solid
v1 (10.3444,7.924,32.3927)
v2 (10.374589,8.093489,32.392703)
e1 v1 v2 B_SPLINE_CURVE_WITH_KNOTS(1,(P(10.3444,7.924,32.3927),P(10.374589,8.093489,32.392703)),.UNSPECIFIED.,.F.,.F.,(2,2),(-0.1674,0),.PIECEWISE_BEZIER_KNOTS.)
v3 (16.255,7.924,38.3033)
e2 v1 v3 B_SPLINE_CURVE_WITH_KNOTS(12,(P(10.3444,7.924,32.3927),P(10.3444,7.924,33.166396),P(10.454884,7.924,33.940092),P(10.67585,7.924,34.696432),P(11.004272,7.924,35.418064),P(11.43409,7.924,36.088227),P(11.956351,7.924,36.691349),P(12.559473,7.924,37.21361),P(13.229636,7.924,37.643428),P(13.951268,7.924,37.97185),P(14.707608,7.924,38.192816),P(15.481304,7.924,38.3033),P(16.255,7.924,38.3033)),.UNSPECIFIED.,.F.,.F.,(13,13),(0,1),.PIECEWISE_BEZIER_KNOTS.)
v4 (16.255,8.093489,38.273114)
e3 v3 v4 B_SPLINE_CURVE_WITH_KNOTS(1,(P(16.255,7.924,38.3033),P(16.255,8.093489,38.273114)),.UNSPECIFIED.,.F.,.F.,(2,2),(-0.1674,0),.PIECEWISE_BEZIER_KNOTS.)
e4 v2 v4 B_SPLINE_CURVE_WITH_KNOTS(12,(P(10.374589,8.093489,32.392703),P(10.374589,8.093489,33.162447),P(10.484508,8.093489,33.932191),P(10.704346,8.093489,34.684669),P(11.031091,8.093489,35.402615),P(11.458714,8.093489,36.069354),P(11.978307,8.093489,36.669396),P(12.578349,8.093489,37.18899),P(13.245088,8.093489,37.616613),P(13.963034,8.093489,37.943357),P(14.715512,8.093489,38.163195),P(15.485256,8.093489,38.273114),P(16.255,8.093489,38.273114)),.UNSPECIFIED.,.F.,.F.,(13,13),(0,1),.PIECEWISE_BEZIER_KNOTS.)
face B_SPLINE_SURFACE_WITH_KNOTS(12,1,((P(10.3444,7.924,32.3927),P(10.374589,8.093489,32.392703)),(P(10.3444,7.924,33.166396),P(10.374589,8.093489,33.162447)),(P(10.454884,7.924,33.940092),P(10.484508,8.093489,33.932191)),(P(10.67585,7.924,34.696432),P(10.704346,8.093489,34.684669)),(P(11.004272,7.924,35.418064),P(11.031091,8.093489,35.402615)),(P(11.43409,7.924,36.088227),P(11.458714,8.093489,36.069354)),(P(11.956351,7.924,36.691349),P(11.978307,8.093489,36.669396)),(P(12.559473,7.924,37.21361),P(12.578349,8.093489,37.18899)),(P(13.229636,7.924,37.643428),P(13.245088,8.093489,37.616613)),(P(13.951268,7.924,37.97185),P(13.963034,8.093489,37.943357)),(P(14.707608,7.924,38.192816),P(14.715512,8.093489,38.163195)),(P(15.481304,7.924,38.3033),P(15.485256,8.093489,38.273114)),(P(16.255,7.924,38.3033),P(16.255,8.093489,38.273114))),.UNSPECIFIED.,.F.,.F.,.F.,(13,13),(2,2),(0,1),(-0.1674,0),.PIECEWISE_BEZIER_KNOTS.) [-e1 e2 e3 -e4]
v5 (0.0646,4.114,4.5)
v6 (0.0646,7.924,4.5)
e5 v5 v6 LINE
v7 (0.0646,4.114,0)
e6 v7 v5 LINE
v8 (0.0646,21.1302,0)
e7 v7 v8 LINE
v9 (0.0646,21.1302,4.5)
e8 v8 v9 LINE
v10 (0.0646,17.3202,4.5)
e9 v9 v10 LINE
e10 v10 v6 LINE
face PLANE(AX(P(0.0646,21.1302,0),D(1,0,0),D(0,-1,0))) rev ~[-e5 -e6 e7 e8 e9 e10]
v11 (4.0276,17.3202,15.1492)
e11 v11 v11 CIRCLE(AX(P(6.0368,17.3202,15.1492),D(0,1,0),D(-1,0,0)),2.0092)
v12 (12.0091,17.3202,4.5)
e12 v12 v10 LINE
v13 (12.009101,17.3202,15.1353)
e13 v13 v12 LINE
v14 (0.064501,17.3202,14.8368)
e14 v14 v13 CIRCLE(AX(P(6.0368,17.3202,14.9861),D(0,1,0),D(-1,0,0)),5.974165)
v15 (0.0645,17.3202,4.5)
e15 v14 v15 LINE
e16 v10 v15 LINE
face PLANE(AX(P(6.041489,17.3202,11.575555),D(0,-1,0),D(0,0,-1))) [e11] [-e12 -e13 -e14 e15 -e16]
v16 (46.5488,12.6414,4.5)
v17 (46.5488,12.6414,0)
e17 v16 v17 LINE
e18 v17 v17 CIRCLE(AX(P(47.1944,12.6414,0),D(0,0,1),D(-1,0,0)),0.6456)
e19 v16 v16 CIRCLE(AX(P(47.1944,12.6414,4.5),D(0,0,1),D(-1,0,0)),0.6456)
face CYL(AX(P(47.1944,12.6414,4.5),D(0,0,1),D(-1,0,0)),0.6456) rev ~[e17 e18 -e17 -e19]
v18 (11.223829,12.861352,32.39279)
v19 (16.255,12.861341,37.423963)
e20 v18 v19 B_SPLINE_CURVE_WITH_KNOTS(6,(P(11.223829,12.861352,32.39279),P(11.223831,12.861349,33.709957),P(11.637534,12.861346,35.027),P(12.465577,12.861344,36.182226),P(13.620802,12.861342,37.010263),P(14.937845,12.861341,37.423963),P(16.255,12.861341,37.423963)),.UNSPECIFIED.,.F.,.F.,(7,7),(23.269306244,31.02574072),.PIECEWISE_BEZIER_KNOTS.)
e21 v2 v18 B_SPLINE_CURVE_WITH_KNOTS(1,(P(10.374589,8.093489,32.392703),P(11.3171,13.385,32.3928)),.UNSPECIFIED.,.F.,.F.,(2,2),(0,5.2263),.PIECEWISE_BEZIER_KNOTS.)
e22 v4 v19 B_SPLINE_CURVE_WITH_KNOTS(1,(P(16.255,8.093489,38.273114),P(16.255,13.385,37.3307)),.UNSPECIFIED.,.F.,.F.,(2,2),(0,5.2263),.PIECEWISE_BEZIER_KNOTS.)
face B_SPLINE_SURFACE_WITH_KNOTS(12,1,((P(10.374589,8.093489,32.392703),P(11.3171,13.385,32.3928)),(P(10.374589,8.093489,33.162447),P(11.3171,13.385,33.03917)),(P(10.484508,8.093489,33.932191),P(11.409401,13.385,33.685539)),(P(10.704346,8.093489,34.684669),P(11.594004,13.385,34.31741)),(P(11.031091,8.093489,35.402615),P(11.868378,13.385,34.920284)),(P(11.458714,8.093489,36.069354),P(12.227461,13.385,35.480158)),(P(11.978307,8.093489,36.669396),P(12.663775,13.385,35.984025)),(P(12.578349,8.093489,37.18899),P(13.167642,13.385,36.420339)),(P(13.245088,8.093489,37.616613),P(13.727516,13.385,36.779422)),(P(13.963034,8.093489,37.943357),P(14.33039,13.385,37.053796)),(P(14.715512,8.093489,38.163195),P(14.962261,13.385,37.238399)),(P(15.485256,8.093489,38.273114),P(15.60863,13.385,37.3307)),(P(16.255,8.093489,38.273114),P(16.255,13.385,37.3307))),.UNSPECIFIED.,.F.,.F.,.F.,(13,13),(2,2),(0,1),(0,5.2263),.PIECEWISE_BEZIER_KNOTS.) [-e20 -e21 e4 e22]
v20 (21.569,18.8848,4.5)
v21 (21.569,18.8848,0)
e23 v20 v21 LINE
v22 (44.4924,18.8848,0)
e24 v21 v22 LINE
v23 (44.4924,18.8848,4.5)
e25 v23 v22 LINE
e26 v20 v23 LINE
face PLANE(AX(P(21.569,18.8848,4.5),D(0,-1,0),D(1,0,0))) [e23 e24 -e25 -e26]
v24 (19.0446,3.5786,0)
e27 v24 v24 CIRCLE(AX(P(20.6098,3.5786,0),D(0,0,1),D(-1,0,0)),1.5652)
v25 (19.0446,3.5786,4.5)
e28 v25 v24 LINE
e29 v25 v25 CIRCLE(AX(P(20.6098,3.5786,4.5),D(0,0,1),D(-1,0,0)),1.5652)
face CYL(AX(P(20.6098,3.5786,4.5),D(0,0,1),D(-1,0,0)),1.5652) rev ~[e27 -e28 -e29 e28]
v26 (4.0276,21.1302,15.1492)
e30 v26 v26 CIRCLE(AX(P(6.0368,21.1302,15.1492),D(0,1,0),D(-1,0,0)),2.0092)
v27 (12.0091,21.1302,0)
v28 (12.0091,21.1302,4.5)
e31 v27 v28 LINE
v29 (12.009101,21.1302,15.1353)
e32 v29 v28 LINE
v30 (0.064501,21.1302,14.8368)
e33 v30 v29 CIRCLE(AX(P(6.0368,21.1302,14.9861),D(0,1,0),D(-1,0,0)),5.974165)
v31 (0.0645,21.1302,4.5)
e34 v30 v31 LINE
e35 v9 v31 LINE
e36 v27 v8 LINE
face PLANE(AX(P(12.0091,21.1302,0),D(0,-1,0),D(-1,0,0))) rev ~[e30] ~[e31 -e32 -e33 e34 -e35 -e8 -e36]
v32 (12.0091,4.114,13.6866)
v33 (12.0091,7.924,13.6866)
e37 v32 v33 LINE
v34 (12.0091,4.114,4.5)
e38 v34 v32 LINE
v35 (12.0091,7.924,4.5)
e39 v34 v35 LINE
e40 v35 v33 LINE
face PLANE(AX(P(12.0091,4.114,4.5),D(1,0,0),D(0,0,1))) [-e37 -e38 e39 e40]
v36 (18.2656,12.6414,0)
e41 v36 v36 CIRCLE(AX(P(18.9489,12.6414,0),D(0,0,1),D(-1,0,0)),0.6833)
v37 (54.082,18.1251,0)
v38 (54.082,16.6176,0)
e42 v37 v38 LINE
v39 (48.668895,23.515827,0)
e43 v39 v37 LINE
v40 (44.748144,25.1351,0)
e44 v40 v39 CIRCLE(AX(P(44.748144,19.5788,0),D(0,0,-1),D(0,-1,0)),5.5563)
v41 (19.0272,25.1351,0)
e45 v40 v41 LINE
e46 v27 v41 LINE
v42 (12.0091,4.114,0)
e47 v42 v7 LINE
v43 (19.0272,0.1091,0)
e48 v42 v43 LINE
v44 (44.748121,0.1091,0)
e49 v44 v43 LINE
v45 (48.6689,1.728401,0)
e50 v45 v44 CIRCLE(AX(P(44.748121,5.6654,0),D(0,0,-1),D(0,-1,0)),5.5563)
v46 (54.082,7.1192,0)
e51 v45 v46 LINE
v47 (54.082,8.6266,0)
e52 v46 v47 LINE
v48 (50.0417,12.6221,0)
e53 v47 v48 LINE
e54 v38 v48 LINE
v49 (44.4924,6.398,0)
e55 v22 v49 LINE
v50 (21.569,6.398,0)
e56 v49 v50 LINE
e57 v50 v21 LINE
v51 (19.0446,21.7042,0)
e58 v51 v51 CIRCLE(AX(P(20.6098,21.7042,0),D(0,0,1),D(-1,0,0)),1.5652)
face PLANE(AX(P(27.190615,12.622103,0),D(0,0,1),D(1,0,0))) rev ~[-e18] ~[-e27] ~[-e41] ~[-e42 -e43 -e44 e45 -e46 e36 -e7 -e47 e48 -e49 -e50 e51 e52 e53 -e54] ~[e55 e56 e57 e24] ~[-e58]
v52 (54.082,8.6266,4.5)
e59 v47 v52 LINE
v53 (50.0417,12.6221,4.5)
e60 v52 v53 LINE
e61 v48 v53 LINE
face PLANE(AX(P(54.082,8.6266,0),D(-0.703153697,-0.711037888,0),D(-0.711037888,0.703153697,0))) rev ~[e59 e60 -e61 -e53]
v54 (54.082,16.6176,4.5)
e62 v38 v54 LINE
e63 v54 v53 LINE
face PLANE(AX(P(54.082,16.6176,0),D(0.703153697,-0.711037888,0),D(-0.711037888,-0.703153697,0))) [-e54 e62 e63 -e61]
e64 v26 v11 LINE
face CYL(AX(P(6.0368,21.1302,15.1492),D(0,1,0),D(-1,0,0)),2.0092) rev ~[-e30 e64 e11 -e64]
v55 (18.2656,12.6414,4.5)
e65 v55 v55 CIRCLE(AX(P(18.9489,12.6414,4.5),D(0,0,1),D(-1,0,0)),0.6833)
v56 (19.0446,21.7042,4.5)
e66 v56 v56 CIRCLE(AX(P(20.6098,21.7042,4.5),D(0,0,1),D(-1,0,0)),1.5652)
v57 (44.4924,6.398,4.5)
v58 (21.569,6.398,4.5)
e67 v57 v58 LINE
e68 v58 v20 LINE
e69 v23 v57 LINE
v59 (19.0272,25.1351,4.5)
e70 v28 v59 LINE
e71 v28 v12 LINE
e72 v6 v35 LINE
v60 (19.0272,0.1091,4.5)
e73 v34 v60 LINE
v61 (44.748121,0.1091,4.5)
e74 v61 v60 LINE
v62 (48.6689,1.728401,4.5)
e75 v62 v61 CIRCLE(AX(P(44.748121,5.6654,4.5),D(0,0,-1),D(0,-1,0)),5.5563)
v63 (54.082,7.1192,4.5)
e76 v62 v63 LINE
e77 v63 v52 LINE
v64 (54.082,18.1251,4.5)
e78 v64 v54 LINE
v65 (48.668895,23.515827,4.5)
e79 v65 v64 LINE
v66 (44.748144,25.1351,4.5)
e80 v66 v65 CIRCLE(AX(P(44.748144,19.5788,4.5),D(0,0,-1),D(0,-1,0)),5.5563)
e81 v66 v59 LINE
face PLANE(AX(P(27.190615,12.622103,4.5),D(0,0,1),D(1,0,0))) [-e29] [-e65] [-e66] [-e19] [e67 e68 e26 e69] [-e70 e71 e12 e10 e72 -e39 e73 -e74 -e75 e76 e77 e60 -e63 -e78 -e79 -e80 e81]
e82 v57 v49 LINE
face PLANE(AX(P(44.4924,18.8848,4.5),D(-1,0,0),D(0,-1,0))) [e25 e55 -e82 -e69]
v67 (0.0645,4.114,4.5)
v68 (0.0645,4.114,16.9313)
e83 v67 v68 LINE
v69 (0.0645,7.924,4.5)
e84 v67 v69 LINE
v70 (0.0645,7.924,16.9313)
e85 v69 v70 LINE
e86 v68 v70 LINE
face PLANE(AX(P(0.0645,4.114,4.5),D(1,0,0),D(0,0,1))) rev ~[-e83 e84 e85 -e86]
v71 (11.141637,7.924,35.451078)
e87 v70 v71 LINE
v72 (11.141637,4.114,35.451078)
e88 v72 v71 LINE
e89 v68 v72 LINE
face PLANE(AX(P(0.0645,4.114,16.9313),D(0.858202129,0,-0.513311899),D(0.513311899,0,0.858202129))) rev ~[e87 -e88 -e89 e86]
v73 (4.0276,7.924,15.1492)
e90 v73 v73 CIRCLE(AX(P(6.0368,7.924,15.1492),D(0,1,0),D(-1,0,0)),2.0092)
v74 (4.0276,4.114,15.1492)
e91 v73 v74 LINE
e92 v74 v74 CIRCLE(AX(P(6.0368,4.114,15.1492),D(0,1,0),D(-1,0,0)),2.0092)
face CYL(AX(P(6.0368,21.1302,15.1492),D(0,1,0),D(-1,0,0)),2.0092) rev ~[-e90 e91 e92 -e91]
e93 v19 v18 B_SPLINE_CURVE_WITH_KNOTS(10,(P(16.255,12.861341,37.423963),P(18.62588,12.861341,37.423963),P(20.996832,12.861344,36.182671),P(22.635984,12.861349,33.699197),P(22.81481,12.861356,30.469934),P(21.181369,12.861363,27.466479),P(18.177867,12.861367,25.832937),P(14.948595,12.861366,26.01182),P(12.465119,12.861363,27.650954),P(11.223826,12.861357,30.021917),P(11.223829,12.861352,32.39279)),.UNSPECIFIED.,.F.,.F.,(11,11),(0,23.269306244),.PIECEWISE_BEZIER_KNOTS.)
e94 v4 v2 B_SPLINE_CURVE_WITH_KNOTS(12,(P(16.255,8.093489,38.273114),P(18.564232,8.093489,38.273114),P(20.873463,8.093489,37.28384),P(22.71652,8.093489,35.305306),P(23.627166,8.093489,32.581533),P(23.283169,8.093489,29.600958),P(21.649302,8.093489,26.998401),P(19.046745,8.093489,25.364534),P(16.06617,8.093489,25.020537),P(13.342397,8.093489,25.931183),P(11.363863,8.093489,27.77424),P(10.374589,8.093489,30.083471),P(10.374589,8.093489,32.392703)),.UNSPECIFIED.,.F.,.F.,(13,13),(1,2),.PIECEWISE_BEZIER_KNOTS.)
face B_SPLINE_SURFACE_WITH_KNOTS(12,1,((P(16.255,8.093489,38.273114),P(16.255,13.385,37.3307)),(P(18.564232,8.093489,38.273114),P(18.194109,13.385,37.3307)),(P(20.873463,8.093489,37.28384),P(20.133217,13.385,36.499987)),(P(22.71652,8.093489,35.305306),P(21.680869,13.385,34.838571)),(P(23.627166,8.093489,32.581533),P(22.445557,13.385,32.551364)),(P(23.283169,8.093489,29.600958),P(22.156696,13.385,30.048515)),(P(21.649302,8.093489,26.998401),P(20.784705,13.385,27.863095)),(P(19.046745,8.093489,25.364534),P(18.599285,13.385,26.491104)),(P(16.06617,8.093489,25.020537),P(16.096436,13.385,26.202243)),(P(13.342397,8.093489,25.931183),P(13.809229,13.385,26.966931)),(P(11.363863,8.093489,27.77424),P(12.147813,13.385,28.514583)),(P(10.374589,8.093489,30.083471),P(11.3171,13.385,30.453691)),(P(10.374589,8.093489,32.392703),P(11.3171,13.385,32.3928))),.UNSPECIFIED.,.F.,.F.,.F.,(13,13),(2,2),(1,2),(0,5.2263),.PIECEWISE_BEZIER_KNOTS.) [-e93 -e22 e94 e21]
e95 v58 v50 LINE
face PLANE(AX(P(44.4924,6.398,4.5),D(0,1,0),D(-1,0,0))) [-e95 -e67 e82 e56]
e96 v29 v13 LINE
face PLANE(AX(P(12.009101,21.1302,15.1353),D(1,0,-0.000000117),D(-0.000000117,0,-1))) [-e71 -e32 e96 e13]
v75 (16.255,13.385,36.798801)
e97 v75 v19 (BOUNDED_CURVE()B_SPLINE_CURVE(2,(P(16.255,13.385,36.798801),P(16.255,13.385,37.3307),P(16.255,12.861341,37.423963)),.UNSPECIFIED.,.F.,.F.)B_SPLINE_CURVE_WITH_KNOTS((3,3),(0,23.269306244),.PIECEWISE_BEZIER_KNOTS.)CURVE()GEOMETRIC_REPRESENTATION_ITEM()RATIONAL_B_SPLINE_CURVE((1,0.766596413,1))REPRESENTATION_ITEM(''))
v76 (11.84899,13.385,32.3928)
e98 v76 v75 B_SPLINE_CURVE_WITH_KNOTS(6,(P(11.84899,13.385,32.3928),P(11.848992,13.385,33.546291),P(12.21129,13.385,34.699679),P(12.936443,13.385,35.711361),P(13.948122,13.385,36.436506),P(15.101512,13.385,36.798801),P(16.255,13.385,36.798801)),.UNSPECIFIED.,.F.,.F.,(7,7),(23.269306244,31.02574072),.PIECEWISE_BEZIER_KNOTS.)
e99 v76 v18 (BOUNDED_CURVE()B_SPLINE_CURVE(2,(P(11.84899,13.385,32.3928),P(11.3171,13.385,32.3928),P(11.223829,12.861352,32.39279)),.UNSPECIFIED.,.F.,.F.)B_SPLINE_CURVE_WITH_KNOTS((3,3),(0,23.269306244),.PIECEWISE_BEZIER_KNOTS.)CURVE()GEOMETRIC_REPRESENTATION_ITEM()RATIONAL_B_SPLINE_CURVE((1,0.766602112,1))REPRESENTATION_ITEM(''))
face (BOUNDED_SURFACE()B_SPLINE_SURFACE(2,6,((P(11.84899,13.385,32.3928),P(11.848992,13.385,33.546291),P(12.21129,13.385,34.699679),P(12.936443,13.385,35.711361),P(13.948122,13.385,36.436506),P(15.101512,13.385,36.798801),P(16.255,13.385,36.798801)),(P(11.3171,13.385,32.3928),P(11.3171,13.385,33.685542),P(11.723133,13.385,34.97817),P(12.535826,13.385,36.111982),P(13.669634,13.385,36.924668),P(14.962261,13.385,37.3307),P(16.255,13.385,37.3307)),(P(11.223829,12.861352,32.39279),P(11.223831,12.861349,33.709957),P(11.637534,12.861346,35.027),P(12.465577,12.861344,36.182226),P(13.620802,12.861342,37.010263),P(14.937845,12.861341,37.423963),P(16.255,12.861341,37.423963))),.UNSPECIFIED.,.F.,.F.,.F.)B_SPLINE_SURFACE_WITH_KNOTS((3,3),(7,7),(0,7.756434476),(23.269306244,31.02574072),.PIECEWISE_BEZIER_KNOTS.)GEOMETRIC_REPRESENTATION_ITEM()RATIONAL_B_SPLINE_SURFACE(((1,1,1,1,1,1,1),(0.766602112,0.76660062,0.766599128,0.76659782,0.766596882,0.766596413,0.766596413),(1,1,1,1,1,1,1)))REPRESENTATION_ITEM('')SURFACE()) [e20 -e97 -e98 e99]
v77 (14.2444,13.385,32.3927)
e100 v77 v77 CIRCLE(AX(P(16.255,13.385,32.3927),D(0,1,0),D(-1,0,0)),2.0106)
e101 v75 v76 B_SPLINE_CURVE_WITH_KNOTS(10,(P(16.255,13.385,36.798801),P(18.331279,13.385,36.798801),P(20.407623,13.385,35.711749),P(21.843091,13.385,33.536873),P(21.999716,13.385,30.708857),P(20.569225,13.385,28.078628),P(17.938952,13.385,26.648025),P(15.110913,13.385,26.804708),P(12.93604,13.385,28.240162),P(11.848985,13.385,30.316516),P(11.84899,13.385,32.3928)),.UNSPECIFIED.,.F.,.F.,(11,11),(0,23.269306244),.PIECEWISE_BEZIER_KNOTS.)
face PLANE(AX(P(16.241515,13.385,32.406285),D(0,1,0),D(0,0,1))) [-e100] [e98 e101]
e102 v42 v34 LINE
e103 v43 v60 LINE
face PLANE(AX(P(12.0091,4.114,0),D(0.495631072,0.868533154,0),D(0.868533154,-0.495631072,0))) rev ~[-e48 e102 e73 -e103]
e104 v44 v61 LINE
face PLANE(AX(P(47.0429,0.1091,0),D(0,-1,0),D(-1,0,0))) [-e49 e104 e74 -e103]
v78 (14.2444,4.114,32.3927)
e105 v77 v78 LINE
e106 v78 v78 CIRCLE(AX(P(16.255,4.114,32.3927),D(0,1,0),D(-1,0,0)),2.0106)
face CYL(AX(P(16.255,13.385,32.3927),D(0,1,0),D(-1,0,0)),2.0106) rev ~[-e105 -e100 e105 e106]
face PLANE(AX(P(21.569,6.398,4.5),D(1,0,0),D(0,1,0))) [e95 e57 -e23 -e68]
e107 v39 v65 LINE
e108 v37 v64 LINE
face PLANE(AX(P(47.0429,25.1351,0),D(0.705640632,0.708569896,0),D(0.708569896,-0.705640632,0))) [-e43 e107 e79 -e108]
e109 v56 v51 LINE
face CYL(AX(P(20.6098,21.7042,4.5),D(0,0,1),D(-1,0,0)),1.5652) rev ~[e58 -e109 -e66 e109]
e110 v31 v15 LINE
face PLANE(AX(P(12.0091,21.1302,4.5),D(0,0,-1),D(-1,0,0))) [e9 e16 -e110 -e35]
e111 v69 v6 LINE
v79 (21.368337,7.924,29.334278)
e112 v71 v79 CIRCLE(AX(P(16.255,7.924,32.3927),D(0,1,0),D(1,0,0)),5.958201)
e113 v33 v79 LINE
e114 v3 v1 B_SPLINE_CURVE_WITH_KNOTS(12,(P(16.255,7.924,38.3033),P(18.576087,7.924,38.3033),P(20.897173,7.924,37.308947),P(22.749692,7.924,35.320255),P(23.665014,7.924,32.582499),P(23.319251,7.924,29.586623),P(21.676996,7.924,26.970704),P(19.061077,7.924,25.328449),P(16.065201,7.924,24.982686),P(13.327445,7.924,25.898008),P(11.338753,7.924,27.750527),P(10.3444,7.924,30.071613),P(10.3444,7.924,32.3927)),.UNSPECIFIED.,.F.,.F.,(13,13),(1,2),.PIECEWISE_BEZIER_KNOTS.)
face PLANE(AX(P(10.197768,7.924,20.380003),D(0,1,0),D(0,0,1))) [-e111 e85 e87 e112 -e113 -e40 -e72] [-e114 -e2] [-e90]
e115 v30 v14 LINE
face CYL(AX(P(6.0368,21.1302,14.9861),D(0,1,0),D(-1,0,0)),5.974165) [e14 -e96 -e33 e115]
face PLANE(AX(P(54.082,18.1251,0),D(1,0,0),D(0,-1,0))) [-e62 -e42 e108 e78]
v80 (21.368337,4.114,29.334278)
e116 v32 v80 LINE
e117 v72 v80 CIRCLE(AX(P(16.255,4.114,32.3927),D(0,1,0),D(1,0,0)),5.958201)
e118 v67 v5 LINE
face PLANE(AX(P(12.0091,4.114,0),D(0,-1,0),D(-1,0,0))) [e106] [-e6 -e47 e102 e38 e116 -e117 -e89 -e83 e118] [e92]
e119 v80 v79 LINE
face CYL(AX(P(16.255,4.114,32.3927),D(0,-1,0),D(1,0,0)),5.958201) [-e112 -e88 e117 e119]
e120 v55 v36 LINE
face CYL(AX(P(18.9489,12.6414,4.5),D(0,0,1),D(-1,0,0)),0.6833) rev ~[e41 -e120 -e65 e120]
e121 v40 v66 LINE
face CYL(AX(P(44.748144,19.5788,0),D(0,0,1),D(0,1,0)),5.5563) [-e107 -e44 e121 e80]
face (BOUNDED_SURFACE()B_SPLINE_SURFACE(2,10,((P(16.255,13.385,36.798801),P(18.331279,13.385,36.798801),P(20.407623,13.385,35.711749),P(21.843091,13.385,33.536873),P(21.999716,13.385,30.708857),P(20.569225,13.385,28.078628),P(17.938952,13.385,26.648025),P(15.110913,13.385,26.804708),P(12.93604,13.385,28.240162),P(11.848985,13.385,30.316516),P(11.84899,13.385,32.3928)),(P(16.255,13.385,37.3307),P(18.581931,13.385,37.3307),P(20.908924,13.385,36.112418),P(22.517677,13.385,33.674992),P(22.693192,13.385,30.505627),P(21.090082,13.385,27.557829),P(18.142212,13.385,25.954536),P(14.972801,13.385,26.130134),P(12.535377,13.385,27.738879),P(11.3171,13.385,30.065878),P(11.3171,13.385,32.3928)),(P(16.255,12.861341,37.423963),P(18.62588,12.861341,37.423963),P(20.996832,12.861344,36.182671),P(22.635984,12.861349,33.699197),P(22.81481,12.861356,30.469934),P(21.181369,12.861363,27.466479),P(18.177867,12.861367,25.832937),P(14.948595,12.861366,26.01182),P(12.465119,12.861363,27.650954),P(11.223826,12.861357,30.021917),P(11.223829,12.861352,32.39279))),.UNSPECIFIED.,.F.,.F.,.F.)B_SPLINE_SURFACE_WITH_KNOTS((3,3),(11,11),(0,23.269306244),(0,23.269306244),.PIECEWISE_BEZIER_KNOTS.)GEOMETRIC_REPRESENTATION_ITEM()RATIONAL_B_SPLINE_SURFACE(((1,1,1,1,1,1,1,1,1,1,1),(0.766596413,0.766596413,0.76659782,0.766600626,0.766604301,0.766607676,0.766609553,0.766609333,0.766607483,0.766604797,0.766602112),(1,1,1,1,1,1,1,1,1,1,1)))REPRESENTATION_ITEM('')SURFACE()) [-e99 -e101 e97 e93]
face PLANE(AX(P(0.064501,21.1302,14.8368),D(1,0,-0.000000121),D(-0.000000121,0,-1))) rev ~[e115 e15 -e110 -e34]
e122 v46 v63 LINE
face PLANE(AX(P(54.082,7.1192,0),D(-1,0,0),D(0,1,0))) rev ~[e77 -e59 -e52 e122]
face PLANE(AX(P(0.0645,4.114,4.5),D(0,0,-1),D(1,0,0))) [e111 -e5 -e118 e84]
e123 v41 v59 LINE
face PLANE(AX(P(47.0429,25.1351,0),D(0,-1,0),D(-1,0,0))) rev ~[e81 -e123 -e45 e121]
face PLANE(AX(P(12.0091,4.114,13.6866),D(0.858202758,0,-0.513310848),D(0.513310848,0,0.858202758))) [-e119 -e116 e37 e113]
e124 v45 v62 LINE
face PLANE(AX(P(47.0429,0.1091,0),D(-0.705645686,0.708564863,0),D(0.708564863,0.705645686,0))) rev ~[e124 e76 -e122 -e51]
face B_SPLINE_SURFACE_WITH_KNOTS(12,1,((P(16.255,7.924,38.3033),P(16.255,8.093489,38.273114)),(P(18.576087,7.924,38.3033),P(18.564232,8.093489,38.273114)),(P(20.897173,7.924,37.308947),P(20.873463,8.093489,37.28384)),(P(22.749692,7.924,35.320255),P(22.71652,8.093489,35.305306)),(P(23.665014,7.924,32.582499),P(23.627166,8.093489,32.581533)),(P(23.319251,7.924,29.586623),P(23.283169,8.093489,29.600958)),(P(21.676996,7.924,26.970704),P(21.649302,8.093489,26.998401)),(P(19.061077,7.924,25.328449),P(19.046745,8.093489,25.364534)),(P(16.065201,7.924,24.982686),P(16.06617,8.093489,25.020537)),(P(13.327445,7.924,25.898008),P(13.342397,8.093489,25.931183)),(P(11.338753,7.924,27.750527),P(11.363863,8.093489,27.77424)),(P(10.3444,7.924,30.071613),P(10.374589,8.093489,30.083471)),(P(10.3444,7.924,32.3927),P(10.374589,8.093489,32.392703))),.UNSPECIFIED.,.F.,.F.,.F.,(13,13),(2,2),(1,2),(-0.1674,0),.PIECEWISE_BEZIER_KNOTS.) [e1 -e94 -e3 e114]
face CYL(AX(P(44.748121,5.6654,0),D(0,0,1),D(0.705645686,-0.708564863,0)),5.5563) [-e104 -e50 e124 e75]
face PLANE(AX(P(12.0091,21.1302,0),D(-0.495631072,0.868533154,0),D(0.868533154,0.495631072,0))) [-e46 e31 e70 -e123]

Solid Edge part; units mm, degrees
sketch "Sketch1" plane through (0, 0, 0) normal (0, 0, -1) x (-1, 0, 0)
  line L0 (-47.0429, 25.1351) -> (-19.0272, 25.1351)
  line L1 (-12.0091, 21.1302) -> (-19.0272, 25.1351)
  line L2 (-12.0091, 21.1302) -> (-0.0646, 21.1302)
  line L3 (-0.0646, 21.1302) -> (-0.0646, 12.6221)
  line L4 (-0.0646, 4.114) -> (-0.0646, 12.6221)
  line L5 (-12.0091, 4.114) -> (-0.0646, 4.114)
  line L6 (-12.0091, 4.114) -> (-19.0272, 0.1091)
  line L7 (-47.0429, 0.1091) -> (-19.0272, 0.1091)
  line L8 (-47.0429, 0.1091) -> (-54.082, 7.1192)
  line L9 (-54.082, 7.1192) -> (-54.082, 8.6266)
  line L10 (-54.082, 8.6266) -> (-50.0417, 12.6221)
  line L11 (-54.082, 16.6176) -> (-50.0417, 12.6221)
  line L12 (-54.082, 18.1251) -> (-54.082, 16.6176)
  line L13 (-47.0429, 25.1351) -> (-54.082, 18.1251)
extrude "Protrusion1" add sketch "Sketch1" against normal blind 4.5
sketch "Sketch2" plane through (6.0368, 4.114, 2.25) normal (0, -1, 0) x (1, 0, 0)
  line L0 (-5.9723, 2.25) -> (-5.9723, 14.6813)
  line L1 (-5.9723, 14.6813) -> (5.1048, 33.2011)
  arc A0 (5.1048, 33.2011) -> (15.3315, 27.0843) centre (10.2182, 30.1427) cw
  line L2 (5.9723, 11.4366) -> (15.3315, 27.0843)
  line L3 (5.9723, 2.25) -> (5.9723, 11.4366)
  line L4 (-5.9723, 2.25) -> (5.9723, 2.25)
extrude "Ajout_matière_2" add sketch "Sketch2" against normal blind 3.81
sketch "Sketch3" plane through (6.0368, 21.1302, 2.25) normal (0, 1, 0) x (-1, 0, 0)
  line L0 (5.9723, 12.5868) -> (5.9723, 2.25)
  line L1 (-5.9723, 2.25) -> (5.9723, 2.25)
  line L2 (-5.9723, 12.8853) -> (-5.9723, 2.25)
  arc A0 (5.9723, 12.5868) -> (-5.9723, 12.8853) centre (0, 12.7361) ccw
extrude "Ajout_matière_3" add sketch "Sketch3" against normal blind 3.81
sketch "Sketch4" plane through (6.0368, 21.1302, 2.25) normal (0, 1, 0) x (-1, 0, 0)
  circle A0 centre (0, 12.8992) radius 2.0092
extrude "Cutout1" cut sketch "Sketch4" against normal through all
sketch "Sketch5" plane through (11.1416, 7.924, 35.4511) normal (-0.513309, 0, -0.8582039) x (0, -1, 0)
  line L0 (-0.1674, -5.9582) -> (-5.3937, -5.9582)
  line L1 (-0.1674, -5.9582) -> (0, -5.9582)
sketch "Sketch6" plane through (16.255, 7.924, 32.3927) normal (0, 1, 0) x (-1, 0, 0)
  circle A0 centre (0, 0) radius 5.9106
sketch "Sketch7" plane through (11.1389, 13.385, 21.4255) normal (0, 1, 0) x (0, 0, 1)
  circle A0 centre (10.9673, 5.1161) radius 4.9379
sweep "Ajout_matière_par_balayage_4" add profiles "Sketch6", "Sketch7" path "Sketch5"
sketch "Sketch8" plane through (16.255, 13.385, 32.3927) normal (0, 1, 0) x (-1, 0, 0)
  circle A0 centre (0, 0) radius 2.0106
extrude "Cutout2" cut sketch "Sketch8" against normal through all
sketch "Sketch9" plane through (27.0733, 12.6221, 4.5) normal (0, 0, 1) x (-1, 0, 0)
  circle A0 centre (8.1244, -0.0193) radius 0.6833
  circle A1 centre (-20.1211, -0.0193) radius 0.6456
  circle A2 centre (6.4635, 9.0435) radius 1.5652
  circle A3 centre (6.4635, -9.0821) radius 1.5652
  line L0 (-17.4191, 6.2241) -> (5.5043, 6.2241)
  line L1 (5.5043, 6.2241) -> (5.5043, -6.2627)
  line L2 (5.5043, -6.2627) -> (-17.4191, -6.2627)
  line L3 (-17.4191, -6.2627) -> (-17.4191, 6.2241)
  dimension "D1" = 2.8194
  dimension "D2" = 2.8194
extrude "Cutout3" cut sketch "Sketch9" against normal through all
fillet "Congé_2" radius 5.5563 2 edges at (47.0429, 25.1351, 2.25) (47.0429, 0.1091, 2.25)
fillet "Congé_3" radius 0.635 1 edges at (21.1929, 13.385, 32.3927)
properties part number "AC_1.09"
